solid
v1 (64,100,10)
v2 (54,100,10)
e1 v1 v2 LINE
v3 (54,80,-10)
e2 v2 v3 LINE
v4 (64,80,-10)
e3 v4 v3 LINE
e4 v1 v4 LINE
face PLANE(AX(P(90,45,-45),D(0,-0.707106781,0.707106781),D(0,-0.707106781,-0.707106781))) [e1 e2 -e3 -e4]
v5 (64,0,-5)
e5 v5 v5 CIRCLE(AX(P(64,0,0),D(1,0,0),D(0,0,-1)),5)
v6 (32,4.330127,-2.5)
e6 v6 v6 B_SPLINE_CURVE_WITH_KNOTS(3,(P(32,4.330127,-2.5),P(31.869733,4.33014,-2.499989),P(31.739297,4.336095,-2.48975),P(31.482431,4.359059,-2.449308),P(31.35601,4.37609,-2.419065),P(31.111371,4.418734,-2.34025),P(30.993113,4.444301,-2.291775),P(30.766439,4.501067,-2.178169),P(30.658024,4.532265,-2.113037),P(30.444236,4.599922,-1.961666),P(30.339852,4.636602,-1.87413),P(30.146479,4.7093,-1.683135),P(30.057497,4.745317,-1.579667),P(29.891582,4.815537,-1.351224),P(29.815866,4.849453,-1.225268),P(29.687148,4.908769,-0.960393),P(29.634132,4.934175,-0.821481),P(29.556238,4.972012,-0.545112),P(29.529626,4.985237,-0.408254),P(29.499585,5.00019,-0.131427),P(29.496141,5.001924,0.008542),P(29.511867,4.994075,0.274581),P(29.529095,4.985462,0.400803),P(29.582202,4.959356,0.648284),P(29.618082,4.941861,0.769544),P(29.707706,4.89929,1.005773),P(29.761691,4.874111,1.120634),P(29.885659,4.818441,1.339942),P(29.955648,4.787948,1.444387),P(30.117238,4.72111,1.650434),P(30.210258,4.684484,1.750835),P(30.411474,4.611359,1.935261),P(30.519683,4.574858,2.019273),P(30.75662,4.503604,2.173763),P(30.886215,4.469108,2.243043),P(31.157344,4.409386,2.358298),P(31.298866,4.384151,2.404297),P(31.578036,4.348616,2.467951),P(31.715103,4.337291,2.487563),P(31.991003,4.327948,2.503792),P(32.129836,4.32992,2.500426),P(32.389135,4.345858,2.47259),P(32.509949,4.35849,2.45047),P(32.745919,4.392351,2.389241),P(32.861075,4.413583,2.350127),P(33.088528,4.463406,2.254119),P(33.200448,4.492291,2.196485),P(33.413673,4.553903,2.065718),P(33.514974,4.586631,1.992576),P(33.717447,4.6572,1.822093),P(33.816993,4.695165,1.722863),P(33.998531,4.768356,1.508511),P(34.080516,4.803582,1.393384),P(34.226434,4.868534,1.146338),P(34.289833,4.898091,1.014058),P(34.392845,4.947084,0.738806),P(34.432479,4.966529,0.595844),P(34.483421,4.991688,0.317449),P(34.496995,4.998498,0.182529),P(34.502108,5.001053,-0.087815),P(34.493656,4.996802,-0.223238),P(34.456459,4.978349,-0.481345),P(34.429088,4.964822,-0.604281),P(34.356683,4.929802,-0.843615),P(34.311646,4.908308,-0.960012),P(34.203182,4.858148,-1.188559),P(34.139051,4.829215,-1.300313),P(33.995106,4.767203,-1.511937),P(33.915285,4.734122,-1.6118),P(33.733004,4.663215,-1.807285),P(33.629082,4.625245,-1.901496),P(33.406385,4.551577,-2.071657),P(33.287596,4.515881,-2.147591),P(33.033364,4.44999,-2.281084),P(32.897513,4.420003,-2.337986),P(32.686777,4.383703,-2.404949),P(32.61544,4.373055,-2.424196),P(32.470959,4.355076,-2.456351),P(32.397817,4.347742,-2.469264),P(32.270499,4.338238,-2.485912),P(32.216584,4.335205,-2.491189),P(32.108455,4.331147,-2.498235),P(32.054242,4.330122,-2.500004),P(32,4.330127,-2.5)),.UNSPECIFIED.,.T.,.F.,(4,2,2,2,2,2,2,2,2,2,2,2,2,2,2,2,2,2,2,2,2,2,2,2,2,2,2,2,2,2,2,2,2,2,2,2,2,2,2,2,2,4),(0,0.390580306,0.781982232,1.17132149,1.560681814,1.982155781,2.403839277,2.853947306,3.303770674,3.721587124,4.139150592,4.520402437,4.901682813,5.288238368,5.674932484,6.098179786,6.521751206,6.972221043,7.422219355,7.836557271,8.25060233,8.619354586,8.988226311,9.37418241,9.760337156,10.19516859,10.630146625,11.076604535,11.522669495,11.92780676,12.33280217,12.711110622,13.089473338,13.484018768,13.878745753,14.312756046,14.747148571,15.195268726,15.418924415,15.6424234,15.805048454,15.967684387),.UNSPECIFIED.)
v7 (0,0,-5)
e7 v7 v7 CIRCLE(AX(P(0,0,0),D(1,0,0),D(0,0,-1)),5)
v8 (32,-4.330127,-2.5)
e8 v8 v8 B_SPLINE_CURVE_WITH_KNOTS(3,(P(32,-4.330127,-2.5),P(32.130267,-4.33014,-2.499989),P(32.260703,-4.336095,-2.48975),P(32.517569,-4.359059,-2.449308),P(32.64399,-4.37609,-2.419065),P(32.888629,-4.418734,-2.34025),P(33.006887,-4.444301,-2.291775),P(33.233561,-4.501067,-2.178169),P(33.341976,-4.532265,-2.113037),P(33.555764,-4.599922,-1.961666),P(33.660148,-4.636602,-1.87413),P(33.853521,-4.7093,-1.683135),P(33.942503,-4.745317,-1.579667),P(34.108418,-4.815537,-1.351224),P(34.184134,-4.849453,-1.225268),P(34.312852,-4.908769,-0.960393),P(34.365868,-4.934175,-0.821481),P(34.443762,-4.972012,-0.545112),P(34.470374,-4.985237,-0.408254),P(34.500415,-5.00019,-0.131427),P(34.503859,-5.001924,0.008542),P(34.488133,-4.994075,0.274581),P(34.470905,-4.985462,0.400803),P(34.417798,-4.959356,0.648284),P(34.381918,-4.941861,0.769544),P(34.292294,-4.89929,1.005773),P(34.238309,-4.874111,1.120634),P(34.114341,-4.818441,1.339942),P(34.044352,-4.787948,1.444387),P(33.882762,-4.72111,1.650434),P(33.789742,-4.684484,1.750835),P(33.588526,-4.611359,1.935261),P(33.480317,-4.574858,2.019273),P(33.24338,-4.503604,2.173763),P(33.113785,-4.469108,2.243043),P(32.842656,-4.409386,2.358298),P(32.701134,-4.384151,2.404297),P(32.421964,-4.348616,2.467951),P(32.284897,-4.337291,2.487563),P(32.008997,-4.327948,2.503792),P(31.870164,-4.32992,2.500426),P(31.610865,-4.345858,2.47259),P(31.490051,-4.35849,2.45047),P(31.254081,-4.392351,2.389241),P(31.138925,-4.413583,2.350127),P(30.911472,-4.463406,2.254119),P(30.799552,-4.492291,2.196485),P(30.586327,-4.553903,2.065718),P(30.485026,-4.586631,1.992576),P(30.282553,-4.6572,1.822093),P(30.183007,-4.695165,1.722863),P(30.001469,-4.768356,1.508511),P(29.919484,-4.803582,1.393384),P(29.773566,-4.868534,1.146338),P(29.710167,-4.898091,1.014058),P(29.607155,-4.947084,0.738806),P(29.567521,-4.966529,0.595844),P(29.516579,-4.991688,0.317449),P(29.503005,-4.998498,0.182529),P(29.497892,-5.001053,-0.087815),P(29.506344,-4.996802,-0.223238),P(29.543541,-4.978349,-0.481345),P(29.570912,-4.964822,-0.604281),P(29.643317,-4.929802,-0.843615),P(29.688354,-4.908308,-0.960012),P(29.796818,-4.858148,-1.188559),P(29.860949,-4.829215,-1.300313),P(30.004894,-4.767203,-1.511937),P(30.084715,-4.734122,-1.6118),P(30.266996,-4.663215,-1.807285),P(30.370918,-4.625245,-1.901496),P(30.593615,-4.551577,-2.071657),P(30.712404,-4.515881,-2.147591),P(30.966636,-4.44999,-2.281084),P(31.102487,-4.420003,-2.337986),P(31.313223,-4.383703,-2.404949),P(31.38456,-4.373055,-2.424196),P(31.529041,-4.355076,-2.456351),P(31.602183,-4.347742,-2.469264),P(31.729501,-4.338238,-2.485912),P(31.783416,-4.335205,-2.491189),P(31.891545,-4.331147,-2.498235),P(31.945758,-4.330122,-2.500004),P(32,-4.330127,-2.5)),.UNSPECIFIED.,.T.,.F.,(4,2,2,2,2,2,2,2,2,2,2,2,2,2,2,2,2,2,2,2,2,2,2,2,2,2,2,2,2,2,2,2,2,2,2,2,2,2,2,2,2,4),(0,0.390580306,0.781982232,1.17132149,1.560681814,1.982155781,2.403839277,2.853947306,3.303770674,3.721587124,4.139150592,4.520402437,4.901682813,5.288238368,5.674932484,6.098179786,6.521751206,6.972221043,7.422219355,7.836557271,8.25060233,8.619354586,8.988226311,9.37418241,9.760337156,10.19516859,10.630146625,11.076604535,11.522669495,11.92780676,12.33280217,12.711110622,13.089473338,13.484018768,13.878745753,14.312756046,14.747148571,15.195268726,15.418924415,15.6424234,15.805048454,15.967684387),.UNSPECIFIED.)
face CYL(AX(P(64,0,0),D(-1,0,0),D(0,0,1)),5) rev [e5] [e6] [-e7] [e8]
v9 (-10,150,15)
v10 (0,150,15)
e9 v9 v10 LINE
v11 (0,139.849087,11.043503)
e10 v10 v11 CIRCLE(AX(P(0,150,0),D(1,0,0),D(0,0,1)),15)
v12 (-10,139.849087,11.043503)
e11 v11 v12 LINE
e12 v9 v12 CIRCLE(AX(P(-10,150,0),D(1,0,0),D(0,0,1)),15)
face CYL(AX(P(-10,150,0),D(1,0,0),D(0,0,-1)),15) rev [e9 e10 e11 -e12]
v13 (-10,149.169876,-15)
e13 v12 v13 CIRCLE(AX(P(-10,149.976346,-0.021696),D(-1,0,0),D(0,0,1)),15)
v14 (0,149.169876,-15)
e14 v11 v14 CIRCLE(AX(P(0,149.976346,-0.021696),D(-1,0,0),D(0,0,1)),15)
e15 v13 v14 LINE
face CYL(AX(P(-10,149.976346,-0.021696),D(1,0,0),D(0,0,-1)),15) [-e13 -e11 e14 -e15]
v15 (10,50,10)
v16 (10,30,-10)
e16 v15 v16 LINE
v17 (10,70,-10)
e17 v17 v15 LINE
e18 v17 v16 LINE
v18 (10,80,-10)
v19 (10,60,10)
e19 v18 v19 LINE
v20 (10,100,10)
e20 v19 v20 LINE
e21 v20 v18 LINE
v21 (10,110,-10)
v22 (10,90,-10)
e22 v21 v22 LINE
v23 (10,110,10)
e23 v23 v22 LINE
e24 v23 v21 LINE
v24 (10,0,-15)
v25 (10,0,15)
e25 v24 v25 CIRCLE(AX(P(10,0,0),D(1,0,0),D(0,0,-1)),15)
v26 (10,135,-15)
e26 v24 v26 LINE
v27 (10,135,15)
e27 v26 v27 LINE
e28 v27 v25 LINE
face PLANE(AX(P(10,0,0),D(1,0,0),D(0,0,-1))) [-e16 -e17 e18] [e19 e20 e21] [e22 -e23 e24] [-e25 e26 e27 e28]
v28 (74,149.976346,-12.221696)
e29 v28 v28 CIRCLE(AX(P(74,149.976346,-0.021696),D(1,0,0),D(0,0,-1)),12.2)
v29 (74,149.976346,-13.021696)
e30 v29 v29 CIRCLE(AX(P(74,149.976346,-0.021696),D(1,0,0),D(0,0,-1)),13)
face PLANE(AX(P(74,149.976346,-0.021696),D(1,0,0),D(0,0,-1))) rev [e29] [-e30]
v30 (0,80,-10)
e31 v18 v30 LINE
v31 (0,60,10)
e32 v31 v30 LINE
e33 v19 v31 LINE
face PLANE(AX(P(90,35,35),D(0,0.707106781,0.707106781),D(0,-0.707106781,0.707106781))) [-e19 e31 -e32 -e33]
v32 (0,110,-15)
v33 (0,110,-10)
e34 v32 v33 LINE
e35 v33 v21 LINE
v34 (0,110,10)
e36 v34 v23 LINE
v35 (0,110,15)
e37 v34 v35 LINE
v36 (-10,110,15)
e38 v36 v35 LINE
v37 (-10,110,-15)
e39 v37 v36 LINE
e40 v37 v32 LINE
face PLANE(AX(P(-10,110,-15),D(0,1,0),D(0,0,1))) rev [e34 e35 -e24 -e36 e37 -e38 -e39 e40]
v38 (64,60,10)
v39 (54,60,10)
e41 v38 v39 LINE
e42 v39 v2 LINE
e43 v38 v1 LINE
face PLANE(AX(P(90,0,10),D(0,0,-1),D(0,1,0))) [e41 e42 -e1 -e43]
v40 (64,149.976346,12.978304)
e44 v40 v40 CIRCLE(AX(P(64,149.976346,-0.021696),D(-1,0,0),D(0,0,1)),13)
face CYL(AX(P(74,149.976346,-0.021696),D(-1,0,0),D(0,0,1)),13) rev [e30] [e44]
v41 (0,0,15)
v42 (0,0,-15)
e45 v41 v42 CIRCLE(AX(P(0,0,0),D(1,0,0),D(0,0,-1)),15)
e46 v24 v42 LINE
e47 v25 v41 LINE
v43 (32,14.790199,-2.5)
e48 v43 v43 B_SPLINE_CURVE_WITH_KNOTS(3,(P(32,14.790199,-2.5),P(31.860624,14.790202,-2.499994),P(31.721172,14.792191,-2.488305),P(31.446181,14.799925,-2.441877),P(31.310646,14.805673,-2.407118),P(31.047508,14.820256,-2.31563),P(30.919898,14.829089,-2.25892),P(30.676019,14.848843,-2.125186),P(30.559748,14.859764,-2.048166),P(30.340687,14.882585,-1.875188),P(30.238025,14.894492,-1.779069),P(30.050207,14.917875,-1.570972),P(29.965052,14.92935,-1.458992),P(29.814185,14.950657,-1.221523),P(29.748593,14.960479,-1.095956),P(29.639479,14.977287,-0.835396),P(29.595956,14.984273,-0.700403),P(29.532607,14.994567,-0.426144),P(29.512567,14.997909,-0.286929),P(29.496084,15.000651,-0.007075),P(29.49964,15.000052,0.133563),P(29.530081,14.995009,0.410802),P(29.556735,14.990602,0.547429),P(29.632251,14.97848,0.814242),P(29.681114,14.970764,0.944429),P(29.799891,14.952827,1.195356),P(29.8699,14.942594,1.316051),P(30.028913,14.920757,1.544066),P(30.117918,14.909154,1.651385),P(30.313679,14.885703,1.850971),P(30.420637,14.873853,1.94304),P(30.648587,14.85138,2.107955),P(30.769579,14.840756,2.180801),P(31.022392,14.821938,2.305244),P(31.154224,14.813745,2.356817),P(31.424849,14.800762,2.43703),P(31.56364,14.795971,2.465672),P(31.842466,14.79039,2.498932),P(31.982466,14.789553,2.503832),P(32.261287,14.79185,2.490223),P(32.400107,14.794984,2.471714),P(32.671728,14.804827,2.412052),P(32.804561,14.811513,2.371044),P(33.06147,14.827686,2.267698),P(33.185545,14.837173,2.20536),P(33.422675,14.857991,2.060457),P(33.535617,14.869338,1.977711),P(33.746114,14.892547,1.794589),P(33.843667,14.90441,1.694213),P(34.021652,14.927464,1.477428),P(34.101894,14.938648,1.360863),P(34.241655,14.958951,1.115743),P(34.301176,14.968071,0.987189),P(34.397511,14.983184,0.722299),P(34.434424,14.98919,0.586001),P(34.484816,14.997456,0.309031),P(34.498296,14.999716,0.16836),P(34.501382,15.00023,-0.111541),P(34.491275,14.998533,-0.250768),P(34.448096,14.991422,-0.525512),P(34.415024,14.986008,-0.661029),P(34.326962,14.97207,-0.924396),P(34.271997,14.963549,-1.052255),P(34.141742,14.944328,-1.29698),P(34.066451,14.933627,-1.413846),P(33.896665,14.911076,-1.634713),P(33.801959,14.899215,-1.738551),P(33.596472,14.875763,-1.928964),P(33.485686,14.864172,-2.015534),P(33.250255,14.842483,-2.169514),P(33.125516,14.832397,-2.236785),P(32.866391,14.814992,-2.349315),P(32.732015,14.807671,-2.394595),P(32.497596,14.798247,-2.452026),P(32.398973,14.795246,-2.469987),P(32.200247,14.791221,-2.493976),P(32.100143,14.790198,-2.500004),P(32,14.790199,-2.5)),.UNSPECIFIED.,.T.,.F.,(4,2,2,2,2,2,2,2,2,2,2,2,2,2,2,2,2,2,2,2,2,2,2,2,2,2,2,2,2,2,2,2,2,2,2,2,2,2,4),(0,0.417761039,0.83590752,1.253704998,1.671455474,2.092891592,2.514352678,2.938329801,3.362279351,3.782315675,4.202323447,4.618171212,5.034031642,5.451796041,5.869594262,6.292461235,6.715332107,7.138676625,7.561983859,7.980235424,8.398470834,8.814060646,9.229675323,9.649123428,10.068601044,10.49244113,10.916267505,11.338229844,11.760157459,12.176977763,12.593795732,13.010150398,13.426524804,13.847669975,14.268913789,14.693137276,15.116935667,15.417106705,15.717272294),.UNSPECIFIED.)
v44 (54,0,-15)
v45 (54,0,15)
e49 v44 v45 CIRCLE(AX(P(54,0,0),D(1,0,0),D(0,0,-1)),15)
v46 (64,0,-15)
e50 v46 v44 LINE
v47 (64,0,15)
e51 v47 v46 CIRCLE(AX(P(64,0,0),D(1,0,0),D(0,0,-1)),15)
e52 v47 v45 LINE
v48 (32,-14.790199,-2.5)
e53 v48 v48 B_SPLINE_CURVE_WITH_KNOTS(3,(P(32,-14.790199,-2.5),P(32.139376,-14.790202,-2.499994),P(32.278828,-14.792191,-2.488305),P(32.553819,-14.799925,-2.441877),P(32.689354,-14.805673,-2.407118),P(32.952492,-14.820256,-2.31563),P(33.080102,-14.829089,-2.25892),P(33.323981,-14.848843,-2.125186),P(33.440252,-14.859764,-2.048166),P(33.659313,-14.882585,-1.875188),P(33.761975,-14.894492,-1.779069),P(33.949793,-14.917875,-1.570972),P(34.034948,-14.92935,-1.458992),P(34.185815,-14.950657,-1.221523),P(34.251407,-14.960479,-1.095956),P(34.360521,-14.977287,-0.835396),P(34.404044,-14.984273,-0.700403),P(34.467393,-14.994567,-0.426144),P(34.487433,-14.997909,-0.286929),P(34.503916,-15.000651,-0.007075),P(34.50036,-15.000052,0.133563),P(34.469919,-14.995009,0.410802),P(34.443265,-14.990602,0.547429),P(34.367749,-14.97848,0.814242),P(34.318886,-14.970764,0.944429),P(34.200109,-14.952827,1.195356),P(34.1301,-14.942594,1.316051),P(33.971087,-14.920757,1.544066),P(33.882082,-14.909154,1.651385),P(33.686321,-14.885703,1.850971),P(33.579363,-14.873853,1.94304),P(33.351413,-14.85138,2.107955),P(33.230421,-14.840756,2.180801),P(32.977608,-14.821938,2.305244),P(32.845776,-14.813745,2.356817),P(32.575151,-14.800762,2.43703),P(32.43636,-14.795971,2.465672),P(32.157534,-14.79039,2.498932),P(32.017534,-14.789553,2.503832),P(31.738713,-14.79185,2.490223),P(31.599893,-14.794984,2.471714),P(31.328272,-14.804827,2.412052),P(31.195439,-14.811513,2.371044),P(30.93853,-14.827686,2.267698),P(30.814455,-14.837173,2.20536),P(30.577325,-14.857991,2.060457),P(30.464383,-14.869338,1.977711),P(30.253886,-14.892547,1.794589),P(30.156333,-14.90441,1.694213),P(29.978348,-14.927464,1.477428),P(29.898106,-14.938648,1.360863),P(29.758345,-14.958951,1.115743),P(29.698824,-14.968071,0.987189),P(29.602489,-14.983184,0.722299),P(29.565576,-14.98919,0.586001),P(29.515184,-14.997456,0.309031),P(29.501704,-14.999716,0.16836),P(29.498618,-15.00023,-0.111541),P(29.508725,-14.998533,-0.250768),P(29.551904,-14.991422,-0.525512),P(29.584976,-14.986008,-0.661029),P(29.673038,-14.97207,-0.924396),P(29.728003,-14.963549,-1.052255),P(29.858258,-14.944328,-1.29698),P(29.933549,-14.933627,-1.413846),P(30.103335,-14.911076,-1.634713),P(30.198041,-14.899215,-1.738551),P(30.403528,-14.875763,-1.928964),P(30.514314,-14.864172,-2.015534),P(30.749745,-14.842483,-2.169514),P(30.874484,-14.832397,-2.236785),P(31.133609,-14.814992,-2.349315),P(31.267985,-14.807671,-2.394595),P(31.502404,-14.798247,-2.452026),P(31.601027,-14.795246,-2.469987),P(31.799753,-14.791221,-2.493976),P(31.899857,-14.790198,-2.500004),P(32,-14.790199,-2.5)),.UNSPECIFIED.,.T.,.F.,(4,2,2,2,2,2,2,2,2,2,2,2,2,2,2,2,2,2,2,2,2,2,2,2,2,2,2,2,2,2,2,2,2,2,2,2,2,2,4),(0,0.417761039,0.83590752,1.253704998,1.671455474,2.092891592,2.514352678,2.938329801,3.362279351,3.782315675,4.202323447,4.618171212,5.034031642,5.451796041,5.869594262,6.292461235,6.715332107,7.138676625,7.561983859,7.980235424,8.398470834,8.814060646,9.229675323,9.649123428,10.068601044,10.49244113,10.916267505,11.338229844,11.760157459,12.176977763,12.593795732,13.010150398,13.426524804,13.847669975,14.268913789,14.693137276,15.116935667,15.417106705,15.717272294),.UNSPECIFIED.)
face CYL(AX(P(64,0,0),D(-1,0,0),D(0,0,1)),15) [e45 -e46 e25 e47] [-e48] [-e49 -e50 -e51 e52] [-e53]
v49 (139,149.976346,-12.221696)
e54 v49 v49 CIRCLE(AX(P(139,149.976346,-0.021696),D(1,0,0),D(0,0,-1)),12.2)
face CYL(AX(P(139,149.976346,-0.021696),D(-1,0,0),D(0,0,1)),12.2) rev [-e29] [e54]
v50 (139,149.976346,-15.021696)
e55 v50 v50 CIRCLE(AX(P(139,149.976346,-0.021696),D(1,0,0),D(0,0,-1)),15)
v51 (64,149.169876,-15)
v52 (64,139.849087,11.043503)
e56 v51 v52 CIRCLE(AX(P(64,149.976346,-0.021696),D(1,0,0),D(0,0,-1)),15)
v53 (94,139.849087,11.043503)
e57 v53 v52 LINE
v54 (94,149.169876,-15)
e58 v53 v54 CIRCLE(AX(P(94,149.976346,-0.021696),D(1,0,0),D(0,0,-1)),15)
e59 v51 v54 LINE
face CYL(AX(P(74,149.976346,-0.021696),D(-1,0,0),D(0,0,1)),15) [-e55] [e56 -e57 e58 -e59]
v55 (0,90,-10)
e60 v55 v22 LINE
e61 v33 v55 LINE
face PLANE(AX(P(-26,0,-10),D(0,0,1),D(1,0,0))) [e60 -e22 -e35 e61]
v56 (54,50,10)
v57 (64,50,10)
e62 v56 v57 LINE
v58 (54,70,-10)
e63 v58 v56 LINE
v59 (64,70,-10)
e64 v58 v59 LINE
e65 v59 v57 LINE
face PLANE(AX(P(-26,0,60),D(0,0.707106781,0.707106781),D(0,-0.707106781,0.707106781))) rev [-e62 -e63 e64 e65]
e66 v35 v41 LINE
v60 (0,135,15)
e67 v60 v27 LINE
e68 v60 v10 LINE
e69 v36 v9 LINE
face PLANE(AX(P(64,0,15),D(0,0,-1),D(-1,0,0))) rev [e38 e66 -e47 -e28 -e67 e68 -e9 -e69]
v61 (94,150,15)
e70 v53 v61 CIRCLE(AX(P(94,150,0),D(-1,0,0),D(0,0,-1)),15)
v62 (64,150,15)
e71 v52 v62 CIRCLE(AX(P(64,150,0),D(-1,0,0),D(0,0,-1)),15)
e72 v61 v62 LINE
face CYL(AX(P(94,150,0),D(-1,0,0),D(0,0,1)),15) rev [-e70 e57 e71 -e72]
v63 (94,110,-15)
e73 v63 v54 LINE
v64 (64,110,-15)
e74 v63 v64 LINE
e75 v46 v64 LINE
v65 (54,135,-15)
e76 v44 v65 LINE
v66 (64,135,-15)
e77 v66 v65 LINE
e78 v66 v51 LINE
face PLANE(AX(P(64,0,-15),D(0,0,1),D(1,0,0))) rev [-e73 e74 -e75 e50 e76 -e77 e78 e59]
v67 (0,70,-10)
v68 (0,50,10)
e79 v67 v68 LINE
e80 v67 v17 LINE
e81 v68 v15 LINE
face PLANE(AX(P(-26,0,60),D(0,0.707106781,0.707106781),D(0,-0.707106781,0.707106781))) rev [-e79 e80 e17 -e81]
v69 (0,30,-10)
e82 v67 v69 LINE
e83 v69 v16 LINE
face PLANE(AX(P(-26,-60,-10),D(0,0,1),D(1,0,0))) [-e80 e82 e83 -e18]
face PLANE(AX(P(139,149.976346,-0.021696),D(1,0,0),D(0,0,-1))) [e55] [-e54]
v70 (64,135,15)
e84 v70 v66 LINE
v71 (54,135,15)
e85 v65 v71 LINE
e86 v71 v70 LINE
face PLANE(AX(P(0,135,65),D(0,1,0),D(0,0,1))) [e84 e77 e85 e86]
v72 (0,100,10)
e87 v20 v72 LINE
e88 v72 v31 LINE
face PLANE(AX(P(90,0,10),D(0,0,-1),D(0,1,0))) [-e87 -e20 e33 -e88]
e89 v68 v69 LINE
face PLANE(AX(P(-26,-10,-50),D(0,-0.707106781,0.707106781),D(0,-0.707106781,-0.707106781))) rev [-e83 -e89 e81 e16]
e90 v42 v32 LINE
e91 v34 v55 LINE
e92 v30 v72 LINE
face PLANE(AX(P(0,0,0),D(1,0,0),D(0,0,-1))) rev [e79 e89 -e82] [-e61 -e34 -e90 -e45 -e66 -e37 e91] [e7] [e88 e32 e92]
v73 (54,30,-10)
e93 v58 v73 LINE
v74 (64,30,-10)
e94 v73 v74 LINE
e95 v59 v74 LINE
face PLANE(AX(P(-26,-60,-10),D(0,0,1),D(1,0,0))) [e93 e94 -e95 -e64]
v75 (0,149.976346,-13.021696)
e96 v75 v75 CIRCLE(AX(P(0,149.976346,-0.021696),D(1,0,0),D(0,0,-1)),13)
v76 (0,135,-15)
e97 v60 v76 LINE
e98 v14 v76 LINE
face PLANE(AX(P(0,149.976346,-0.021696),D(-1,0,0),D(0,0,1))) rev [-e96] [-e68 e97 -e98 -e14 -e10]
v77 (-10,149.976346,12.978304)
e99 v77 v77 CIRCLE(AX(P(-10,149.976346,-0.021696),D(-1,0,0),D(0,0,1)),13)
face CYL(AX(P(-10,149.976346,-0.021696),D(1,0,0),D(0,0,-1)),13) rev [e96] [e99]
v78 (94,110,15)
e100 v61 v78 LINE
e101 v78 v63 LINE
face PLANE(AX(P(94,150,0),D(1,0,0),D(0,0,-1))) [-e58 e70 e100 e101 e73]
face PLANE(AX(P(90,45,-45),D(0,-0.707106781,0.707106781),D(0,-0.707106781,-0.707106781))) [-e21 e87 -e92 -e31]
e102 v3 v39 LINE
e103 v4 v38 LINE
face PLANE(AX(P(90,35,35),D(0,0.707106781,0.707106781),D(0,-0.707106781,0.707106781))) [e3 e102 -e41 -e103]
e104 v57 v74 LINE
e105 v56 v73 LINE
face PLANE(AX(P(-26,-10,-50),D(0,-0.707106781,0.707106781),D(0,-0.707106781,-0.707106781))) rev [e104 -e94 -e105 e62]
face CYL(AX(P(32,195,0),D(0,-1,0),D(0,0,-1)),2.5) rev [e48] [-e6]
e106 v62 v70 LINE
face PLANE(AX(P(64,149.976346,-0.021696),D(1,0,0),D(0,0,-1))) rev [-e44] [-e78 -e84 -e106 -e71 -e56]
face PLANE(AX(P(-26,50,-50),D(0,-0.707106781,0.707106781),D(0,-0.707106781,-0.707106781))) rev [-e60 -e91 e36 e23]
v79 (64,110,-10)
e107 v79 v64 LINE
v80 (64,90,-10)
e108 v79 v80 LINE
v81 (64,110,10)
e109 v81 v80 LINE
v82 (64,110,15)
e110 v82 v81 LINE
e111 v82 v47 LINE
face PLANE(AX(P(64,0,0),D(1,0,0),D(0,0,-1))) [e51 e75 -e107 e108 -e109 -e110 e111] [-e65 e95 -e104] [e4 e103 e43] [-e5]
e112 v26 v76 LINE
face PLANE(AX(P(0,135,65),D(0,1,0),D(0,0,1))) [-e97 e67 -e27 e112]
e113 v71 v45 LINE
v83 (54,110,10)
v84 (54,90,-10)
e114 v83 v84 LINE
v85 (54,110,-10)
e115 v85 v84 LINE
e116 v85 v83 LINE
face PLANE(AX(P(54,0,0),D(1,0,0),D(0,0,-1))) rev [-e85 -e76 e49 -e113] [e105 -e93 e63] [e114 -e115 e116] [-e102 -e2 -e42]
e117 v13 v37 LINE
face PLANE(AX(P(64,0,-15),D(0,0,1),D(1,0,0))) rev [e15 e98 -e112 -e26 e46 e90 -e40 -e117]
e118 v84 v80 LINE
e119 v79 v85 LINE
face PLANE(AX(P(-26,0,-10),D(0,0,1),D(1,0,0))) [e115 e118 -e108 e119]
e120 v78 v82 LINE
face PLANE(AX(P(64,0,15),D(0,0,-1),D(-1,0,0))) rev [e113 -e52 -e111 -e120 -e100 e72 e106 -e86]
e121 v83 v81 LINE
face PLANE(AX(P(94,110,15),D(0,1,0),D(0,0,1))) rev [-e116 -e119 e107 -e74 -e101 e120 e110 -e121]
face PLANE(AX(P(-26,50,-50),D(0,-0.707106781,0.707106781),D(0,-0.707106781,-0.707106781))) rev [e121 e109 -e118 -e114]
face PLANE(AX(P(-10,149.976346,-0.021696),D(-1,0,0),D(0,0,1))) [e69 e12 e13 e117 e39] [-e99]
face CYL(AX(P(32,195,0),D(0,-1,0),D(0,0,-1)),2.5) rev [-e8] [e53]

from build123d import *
from build123d.topology import SkipClean

# Parameters (mm, degrees)
CROQUIS2_R                 = 5
SALIENTE_EXTRUIR2_DEPTH    = 64
VACIADO1_START             = 10
VACIADO1_DEPTH             = 44
CORTAR_EXTRUIR1_DEPTH      = 195
CORTAR_EXTRUIR1_DEPTH_BACK = 36
CROQUIS3_R                 = 2.5
CORTAR_EXTRUIR2_DEPTH      = 90
CORTAR_EXTRUIR3_DEPTH      = 90
MATRIZL1_COUNT             = 2
MATRIZL1_PITCH             = 60
CROQUIS7_R                 = 15
CROQUIS7_R_2               = 13
SALIENTE_EXTRUIR3_DEPTH    = 10
SALIENTE_EXTRUIR4_START    = 10
CROQUIS8_R                 = 15
CROQUIS8_R_2               = 13
SALIENTE_EXTRUIR4_DEPTH    = 10
SALIENTE_EXTRUIR5_START    = 65
CROQUIS9_R                 = 15
CROQUIS9_R_2               = 12.2
SALIENTE_EXTRUIR5_DEPTH    = 65
CORTAR_EXTRUIR4_DEPTH      = 65
CORTAR_EXTRUIR4_DEPTH_BACK = 65
CROQUIS11_W                = 64
CROQUIS11_H                = 30
SALIENTE_EXTRUIR6_DEPTH    = 30
SALIENTE_EXTRUIR7_START    = 10
SALIENTE_EXTRUIR7_DEPTH    = 10
SALIENTE_EXTRUIR8_DEPTH    = 10
SALIENTE_EXTRUIR9_DEPTH    = 10


# Read off the part's stored shape, not the designer's step: Vaciado1
with BuildPart() as part:
    # Croquis2 → Saliente-Extruir2 (new body)
    with BuildSketch(Plane(origin=(0, 0, 0), x_dir=(0, 0, -1), z_dir=(1, 0, 0))):
        with BuildLine():
            Line((15, 0), (15, 150))
            ThreePointArc((15, 150), (0, 165), (-15, 150))
            Line((-15, 150), (-15, 0))
            ThreePointArc((-15, 0), (0, -15), (15, 0))
        make_face()
        Circle(CROQUIS2_R, mode=Mode.SUBTRACT)
        with Locations((0, 150)):
            Circle(CROQUIS2_R, mode=Mode.SUBTRACT)
    extrude(amount=SALIENTE_EXTRUIR2_DEPTH)

    # Vaciado1 outline → Vaciado1 (cut)
    with SkipClean():  # the faces are left unmerged after this step: merging them gives an invalid solid
        with BuildSketch(Plane.YZ.offset(VACIADO1_START)):
            with BuildLine():
                ThreePointArc((0, 15), (15, 0), (0, -15))
                Line((0, -15), (150, -15))
                ThreePointArc((150, -15), (135, 0), (150, 15))
                Line((150, 15), (0, 15))
            make_face()
        extrude(amount=VACIADO1_DEPTH, mode=Mode.SUBTRACT)

    # Croquis3 → Cortar-Extruir1 (cut, two sides: drawn at the far end of the back side and taken through both)
    with SkipClean():  # the faces are left unmerged after this step: merging them gives an invalid solid
        with BuildSketch(Plane(origin=(0, 0, 0), x_dir=(1, 0, 0), z_dir=(0, 1, 0)).offset(-CORTAR_EXTRUIR1_DEPTH_BACK)):
            with Locations(Location((32, 0, 0), (0, 0, 90))):
                Circle(CROQUIS3_R)
        extrude(amount=CORTAR_EXTRUIR1_DEPTH + CORTAR_EXTRUIR1_DEPTH_BACK, mode=Mode.SUBTRACT)

    # Croquis4 → Cortar-Extruir2 (cut)
    with SkipClean():  # the faces are left unmerged after this step: merging them gives an invalid solid
        with BuildSketch(Plane(origin=(64, 0, 0), x_dir=(0, 0, -1), z_dir=(1, 0, 0))):
            Polygon((10, 90), (10, 130), (-10, 110), align=None)
        cortar_extruir2 = extrude(amount=-CORTAR_EXTRUIR2_DEPTH, mode=Mode.SUBTRACT)

    # Croquis5 → Cortar-Extruir3 (cut)
    with SkipClean():  # the faces are left unmerged after this step: merging them gives an invalid solid
        with BuildSketch(Plane.ZY):
            Polygon((10, 60), (-10, 80), (10, 100), align=None)
        extrude(amount=-CORTAR_EXTRUIR3_DEPTH, mode=Mode.SUBTRACT)

    # MatrizL1: Cortar-Extruir2 ×2
    with SkipClean():  # the faces are left unmerged after this step: merging them gives an invalid solid
        with Locations(*[(0, -i * MATRIZL1_PITCH, 0) for i in range(1, MATRIZL1_COUNT)]):
            add(cortar_extruir2, mode=Mode.SUBTRACT)

    # Croquis7 → Saliente-Extruir3 (add)
    with SkipClean():  # the faces are left unmerged after this step: merging them gives an invalid solid
        with BuildSketch(Plane.ZY):
            with Locations(Location((-0.021695503, 149.976346025, 0), (0, 0, 183.081975769))):
                Circle(CROQUIS7_R)
            with Locations((-0.021695503, 149.976346025)):
                Circle(CROQUIS7_R_2, mode=Mode.SUBTRACT)
        extrude(amount=SALIENTE_EXTRUIR3_DEPTH)

    # Croquis8 → Saliente-Extruir4 (add)
    with SkipClean():  # the faces are left unmerged after this step: merging them gives an invalid solid
        with BuildSketch(Plane(origin=(64, 0, 0), x_dir=(0, 0, -1), z_dir=(1, 0, 0)).offset(SALIENTE_EXTRUIR4_START)):
            with Locations(Location((0.021695503, 149.976346025, 0), (0, 0, 356.918024231))):
                Circle(CROQUIS8_R)
            with Locations(Location((0.021695503, 149.976346025, 0), (0, 0, 180))):
                Circle(CROQUIS8_R_2, mode=Mode.SUBTRACT)
        extrude(amount=-SALIENTE_EXTRUIR4_DEPTH)

    # Croquis9 → Saliente-Extruir5 (add)
    with SkipClean():  # the faces are left unmerged after this step: merging them gives an invalid solid
        with BuildSketch(Plane(origin=(74, 0, 0), x_dir=(0, 0, -1), z_dir=(1, 0, 0)).offset(SALIENTE_EXTRUIR5_START)):
            with Locations(Location((0.021695503, 149.976346025, 0), (0, 0, 356.918024231))):
                Circle(CROQUIS9_R)
            with Locations((0.021695503, 149.976346025)):
                Circle(CROQUIS9_R_2, mode=Mode.SUBTRACT)
        extrude(amount=-SALIENTE_EXTRUIR5_DEPTH)

    # Croquis11 → Cortar-Extruir4 (cut, two sides: drawn at the far end of the back side and taken through both)
    with SkipClean():  # the faces are left unmerged after this step: merging them gives an invalid solid
        with BuildSketch(Plane.XY.offset(-CORTAR_EXTRUIR4_DEPTH_BACK)):
            with Locations((32, 150)):
                Rectangle(CROQUIS11_W, CROQUIS11_H)
        extrude(amount=CORTAR_EXTRUIR4_DEPTH + CORTAR_EXTRUIR4_DEPTH_BACK, mode=Mode.SUBTRACT)

    # Croquis12 → Saliente-Extruir6 (add)
    with SkipClean():  # the faces are left unmerged after this step: merging them gives an invalid solid
        with BuildSketch(Plane(origin=(64, 0, 0), x_dir=(0, 0, -1), z_dir=(1, 0, 0))):
            with BuildLine():
                Line((-15, 135), (-15, 110))
                Line((-15, 110), (15, 110))
                Line((15, 110), (15, 135))
                Line((15, 135), (15, 150))
                ThreePointArc((15, 150), (0, 135), (-15, 150))
                Line((-15, 150), (-15, 135))
            make_face()
        extrude(amount=SALIENTE_EXTRUIR6_DEPTH)

    # Croquis13 → Saliente-Extruir7 (add)
    with SkipClean():  # the faces are left unmerged after this step: merging them gives an invalid solid
        with BuildSketch(Plane.ZY.offset(SALIENTE_EXTRUIR7_START)):
            with BuildLine():
                Line((-15, 135), (-15, 150))
                ThreePointArc((-15, 150), (0, 135), (15, 150))
                Line((15, 150), (15, 135))
                Line((15, 135), (15, 110))
                Line((15, 110), (-15, 110))
                Line((-15, 110), (-15, 135))
            make_face()
        extrude(amount=-SALIENTE_EXTRUIR7_DEPTH)

    # Croquis14 → Saliente-Extruir8 (add)
    with SkipClean():  # the faces are left unmerged after this step: merging them gives an invalid solid
        with BuildSketch(Plane(origin=(10, 0, 0), x_dir=(0, 0, -1), z_dir=(1, 0, 0))):
            Polygon((-10, 110), (10, 130), (10, 110), align=None)
        extrude(amount=-SALIENTE_EXTRUIR8_DEPTH)

    # Croquis15 → Saliente-Extruir9 (add)
    with SkipClean():  # the faces are left unmerged after this step: merging them gives an invalid solid
        with BuildSketch(Plane.ZY.offset(-54)):
            Polygon((-10, 130), (10, 110), (-10, 110), align=None)
        extrude(amount=-SALIENTE_EXTRUIR9_DEPTH)


solid = part.part
